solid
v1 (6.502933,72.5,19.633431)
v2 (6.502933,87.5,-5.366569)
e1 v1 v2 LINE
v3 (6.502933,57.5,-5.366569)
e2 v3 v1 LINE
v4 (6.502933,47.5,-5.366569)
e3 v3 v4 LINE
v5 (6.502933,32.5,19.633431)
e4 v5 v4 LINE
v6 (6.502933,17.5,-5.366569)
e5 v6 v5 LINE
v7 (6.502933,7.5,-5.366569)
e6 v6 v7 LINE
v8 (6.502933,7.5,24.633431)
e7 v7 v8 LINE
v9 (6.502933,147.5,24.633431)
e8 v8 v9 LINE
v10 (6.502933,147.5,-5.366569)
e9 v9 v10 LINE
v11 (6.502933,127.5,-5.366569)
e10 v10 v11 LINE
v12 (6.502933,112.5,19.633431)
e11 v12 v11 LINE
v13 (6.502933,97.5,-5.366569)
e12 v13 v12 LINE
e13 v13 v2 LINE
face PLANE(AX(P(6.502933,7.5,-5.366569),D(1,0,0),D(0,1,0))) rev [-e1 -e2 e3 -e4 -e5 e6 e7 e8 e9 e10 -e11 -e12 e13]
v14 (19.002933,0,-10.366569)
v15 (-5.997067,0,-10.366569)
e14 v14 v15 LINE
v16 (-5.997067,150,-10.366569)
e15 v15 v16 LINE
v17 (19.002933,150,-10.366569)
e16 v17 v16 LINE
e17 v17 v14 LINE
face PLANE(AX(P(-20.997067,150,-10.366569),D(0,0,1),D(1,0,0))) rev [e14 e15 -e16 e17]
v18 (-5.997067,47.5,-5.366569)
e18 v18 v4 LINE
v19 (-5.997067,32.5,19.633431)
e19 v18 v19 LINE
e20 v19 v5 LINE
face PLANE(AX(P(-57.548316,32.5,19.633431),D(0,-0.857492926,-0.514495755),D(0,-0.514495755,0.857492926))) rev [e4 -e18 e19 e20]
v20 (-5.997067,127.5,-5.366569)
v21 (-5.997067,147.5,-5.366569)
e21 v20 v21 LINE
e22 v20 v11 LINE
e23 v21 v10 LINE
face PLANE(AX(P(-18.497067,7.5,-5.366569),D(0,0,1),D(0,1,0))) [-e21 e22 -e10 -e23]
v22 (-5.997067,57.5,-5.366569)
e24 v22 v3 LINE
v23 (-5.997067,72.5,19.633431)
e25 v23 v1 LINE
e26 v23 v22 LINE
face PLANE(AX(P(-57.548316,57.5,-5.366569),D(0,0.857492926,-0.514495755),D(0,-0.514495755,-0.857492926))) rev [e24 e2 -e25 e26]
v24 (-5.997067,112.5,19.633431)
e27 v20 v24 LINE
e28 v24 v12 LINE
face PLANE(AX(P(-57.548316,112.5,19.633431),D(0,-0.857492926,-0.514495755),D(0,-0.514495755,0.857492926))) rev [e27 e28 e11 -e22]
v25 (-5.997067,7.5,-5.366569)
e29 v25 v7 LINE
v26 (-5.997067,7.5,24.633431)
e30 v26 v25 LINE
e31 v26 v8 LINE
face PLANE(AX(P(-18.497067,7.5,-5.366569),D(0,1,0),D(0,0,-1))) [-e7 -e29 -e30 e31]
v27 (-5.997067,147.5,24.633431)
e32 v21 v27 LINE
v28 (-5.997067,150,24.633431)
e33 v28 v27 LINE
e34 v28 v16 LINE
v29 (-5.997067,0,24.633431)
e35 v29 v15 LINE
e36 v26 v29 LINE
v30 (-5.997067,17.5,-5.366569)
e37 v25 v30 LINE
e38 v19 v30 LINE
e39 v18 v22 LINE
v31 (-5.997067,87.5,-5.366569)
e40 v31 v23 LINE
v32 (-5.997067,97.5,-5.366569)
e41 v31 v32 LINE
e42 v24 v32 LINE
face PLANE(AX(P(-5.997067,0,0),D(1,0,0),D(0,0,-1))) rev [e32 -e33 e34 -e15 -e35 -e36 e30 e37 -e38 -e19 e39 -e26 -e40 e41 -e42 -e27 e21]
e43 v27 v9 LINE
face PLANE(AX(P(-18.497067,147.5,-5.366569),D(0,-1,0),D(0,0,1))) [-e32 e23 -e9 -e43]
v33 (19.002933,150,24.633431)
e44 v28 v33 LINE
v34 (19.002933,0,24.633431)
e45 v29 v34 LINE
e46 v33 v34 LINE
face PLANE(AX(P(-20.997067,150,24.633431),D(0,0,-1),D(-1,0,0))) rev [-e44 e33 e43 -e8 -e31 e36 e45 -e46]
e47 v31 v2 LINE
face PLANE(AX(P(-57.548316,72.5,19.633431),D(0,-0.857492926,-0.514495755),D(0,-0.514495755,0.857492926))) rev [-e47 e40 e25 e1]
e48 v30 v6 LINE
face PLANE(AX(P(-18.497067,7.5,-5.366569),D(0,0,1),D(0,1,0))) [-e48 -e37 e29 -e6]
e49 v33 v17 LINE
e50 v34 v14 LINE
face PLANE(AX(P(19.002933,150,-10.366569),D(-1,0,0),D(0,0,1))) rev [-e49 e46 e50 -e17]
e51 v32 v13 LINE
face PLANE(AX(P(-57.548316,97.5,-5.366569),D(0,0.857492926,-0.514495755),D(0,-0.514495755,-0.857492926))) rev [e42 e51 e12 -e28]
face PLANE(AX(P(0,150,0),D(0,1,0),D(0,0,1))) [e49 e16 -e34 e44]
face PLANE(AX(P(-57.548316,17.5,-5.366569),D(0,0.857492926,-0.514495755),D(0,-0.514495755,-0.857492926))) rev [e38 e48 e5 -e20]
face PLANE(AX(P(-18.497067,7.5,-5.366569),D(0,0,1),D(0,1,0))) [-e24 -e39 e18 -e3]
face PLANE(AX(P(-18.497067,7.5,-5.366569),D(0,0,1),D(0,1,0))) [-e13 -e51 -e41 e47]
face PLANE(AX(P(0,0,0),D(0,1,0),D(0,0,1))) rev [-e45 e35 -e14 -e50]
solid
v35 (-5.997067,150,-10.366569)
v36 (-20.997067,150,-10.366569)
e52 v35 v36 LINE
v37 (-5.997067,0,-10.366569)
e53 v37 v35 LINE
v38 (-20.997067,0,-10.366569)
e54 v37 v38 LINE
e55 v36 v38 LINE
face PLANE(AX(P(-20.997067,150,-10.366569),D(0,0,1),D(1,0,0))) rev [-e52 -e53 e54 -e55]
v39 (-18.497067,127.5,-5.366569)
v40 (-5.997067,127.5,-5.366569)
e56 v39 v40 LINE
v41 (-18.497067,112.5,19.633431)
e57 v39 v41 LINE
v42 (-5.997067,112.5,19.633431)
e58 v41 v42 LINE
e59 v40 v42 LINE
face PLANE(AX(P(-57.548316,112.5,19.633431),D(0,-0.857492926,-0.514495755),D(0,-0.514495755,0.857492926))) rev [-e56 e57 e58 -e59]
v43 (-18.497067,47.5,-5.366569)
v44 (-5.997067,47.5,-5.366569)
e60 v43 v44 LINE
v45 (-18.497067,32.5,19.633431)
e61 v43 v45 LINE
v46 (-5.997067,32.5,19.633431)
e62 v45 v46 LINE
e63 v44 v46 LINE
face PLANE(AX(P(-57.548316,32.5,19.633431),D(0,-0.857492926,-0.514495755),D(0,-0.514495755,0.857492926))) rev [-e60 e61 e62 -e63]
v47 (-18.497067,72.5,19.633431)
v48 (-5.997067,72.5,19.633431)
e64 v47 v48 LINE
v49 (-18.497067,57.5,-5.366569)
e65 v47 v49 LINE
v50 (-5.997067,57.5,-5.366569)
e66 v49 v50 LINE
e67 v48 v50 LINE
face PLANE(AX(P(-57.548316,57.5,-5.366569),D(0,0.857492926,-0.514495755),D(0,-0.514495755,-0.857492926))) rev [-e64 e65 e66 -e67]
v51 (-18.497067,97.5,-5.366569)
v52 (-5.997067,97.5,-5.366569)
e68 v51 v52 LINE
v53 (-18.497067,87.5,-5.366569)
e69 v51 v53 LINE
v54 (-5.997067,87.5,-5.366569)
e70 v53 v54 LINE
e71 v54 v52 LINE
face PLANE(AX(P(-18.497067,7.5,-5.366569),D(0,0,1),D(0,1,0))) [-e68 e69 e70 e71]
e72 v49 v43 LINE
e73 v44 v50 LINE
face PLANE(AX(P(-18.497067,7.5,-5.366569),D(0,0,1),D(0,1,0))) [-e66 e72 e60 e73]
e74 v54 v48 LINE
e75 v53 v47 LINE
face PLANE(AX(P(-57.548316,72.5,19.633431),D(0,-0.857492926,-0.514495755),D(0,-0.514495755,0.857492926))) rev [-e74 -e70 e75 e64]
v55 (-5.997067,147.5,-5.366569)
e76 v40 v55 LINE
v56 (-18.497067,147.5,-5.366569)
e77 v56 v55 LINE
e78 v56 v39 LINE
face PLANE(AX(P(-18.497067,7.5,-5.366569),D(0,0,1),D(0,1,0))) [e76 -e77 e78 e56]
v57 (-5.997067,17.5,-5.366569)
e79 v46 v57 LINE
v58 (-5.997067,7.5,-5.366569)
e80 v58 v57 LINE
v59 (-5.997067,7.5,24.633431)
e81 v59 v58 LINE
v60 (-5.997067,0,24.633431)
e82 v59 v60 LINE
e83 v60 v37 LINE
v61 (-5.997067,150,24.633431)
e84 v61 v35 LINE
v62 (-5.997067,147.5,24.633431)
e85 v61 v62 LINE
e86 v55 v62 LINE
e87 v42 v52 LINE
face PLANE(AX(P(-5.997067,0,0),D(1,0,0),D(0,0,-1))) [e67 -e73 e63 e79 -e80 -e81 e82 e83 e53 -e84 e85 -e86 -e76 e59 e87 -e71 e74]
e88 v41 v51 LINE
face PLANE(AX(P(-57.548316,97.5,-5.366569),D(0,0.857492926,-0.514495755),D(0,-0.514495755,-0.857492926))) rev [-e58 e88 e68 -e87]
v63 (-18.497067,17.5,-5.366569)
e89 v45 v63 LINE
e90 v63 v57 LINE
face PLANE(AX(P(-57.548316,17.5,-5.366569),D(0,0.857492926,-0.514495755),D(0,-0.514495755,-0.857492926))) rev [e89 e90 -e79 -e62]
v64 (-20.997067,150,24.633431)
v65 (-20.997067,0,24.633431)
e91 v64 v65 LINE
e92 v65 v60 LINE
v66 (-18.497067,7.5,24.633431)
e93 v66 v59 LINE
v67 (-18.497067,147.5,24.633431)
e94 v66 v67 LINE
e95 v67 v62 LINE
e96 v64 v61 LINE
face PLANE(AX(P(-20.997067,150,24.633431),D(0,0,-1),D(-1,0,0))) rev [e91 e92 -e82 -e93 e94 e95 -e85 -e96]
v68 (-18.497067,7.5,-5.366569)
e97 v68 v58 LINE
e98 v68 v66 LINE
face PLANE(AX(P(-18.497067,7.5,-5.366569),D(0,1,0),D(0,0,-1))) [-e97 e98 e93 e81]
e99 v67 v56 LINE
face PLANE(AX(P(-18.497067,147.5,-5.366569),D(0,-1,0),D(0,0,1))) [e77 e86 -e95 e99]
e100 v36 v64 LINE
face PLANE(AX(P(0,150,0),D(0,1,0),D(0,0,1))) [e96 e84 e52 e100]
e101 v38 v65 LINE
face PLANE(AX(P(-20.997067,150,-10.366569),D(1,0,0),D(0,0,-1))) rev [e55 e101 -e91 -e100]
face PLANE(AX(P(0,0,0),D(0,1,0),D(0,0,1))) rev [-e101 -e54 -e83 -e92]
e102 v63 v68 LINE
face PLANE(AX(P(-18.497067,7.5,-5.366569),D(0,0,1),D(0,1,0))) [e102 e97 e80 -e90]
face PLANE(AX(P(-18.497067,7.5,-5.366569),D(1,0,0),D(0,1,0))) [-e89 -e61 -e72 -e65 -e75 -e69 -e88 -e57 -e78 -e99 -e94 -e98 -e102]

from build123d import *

# Parameters (mm, degrees)
SKETCH2_W           = 40
SKETCH2_H           = 35
BOSS_EXTRUDE1_DEPTH = 150
CAVITY1_START       = -18.497067449
CAVITY1_DEPTH       = 25


# Read off the part's stored shape, not the designer's step: Cavity1
with BuildPart() as part:
    # Sketch2 → Boss-Extrude1 (new body)
    with BuildSketch(Plane(origin=(0, 0, 0), x_dir=(1, 0, 0), z_dir=(0, 1, 0))):
        with Locations((-0.997067449, -7.133431085)):
            Rectangle(SKETCH2_W, SKETCH2_H)
    extrude(amount=BOSS_EXTRUDE1_DEPTH)

    # Cavity1 outline → Cavity1 (cut)
    with BuildSketch(Plane.YZ.offset(CAVITY1_START)):
        Polygon((87.5, -5.366568915), (97.5, -5.366568915), (112.5, 19.633431085), (127.5, -5.366568915), (147.5, -5.366568915), (147.5, 24.633431085), (7.5, 24.633431085), (7.5, -5.366568915), (17.5, -5.366568915), (32.5, 19.633431085), (47.5, -5.366568915), (57.5, -5.366568915), (72.5, 19.633431085), align=None)
    extrude(amount=CAVITY1_DEPTH, mode=Mode.SUBTRACT)


with BuildPart() as body_2:
    # Split1: the piece on the far side of the plane
    add(part.part)
    split(bisect_by=Plane(origin=(-5.997067449, 0, 0), x_dir=(0, 0, 1), z_dir=(1, 0, 0)), keep=Keep.BOTTOM)


with BuildPart() as part_1:
    add(part.part)

    # Split1
    split(bisect_by=Plane(origin=(-5.997067449, 0, 0), x_dir=(0, 0, 1), z_dir=(1, 0, 0)), keep=Keep.TOP)


solid = Compound([body_2.part, part_1.part])
